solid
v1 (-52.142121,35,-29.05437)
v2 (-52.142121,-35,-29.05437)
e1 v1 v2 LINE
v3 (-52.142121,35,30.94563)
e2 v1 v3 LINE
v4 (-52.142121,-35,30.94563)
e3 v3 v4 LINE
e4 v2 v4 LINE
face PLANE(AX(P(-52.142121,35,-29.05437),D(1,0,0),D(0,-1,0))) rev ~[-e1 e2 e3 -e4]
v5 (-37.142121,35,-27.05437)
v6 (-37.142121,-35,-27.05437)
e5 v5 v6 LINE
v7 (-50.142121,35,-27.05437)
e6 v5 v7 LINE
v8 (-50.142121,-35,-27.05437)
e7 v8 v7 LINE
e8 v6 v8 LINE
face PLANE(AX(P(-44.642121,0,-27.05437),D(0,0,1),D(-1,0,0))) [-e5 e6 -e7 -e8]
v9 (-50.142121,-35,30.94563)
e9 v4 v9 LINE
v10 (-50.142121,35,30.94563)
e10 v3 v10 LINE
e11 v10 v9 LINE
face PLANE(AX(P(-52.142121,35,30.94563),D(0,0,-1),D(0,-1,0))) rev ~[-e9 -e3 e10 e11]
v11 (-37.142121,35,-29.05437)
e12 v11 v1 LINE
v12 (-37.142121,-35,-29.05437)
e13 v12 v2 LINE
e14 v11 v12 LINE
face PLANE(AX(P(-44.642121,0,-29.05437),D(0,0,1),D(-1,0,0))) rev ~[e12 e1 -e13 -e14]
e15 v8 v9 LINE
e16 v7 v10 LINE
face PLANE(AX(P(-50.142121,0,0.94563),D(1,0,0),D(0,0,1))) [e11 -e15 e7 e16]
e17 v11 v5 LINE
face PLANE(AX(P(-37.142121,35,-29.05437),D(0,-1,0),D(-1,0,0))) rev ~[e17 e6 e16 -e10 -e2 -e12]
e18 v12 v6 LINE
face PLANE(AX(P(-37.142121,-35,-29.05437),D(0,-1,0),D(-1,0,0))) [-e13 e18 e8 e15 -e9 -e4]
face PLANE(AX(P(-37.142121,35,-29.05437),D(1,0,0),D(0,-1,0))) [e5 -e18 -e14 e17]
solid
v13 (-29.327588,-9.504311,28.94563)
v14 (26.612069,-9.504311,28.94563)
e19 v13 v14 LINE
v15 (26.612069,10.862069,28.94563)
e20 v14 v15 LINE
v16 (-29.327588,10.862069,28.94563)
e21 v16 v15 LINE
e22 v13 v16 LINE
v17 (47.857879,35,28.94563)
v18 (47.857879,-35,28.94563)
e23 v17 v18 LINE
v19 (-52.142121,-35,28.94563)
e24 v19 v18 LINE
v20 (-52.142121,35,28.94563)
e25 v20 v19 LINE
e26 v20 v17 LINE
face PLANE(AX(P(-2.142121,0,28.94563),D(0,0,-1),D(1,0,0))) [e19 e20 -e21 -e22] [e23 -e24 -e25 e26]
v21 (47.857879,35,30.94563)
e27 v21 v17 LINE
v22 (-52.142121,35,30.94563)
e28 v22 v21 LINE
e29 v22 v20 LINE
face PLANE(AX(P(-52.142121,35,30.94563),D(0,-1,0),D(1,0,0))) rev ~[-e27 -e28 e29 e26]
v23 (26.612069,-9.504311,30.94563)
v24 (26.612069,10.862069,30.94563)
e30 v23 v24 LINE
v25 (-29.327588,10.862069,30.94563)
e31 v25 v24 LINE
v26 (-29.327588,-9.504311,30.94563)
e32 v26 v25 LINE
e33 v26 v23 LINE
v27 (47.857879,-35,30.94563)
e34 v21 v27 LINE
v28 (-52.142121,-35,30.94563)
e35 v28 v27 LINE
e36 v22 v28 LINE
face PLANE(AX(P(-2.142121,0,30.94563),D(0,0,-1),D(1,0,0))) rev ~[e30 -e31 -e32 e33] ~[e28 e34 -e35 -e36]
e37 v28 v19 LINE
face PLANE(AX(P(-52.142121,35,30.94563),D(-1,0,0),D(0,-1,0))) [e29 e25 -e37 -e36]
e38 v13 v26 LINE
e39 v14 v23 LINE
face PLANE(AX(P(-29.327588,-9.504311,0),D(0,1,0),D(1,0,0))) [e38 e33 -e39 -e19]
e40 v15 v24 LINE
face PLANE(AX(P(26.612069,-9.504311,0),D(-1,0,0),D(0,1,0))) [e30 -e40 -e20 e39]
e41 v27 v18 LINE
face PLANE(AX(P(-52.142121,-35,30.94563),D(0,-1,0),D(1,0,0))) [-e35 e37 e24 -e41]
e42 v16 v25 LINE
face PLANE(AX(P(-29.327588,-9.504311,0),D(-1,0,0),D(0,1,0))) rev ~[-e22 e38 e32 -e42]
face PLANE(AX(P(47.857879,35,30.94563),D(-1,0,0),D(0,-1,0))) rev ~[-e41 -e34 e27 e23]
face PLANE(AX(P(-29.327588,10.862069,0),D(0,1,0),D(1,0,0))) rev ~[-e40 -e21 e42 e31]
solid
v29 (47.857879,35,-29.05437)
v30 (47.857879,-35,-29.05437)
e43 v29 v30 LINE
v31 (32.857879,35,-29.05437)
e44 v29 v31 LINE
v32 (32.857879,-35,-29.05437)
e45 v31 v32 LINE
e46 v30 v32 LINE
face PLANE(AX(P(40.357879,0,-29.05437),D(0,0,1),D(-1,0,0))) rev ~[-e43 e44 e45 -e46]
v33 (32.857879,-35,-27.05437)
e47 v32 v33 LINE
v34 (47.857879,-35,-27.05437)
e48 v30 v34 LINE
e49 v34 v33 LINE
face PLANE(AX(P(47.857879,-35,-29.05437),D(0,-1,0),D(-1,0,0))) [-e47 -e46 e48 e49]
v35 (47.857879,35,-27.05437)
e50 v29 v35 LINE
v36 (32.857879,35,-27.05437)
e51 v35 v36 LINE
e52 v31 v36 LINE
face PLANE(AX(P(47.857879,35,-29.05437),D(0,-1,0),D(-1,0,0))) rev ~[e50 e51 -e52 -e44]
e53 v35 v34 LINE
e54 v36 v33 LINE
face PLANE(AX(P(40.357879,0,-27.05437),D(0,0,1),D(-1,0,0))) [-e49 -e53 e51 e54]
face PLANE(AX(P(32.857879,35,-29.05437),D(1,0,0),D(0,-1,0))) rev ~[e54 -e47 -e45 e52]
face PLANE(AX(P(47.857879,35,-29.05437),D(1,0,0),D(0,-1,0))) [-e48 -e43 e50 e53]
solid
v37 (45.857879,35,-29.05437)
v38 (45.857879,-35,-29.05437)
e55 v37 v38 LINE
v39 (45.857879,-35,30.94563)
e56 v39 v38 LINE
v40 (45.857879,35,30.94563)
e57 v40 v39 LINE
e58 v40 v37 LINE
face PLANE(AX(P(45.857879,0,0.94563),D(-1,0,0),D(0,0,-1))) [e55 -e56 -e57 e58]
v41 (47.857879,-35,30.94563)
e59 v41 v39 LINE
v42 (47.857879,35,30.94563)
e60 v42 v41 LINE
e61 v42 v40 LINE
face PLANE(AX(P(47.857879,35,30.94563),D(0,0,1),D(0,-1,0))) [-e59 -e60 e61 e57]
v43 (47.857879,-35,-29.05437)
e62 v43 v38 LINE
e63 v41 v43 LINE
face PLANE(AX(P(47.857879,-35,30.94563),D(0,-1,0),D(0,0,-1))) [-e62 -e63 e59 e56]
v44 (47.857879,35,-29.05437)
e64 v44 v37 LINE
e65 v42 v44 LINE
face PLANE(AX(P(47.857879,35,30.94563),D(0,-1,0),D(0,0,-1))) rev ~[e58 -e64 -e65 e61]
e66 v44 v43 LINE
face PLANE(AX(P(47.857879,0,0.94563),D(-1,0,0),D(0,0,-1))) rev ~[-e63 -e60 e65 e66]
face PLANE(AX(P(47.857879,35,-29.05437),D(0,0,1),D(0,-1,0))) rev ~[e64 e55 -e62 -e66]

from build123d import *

# Parameters (mm, degrees)
F1_E0_W  = 15
F1_E0_H  = 70
F2_DEPTH = 2
F1_E4_W  = 15
F1_E4_H  = 70
F1_E1_W  = 60
F1_E1_H  = 70
F3_DEPTH = 2
F1_E2_W  = 100
F1_E2_H  = 70
F4_DEPTH = 2
F1_E3_W  = 60
F1_E3_H  = 70
F5_DEPTH = 2
F6_W     = 55.9396576136
F6_H     = 20.3663799912
F7_DEPTH = 30.9466302677


with BuildPart() as f2:
    # F1_E0 (on explicit) → F2 (new body)
    with BuildSketch(Plane(origin=(-37.1421206879, 35, -29.0543697323), x_dir=(-1, 0, 0), z_dir=(0, 0, 1))):
        with Locations((7.5, 35)):
            Rectangle(F1_E0_W, F1_E0_H)
    extrude(amount=F2_DEPTH)

    # F1_E1 (on explicit) → F3 (join)
    with BuildSketch(Plane(origin=(-52.1421206879, 35, -29.0543697323), x_dir=(0, 0, 1), z_dir=(1, 0, 0))):
        with Locations((30, 35)):
            Rectangle(F1_E1_W, F1_E1_H)
    extrude(amount=F3_DEPTH)


with BuildPart() as f2b:
    # F1_E4 (on explicit) → F2, piece 2 (new body)
    with BuildSketch(Plane(origin=(47.8578793121, 35, -29.0543697323), x_dir=(-1, 0, 0), z_dir=(0, 0, 1))):
        with Locations((7.5, 35)):
            Rectangle(F1_E4_W, F1_E4_H)
    extrude(amount=F2_DEPTH)


with BuildPart() as f4:
    # F1_E2 (on explicit) → F4 (new body)
    with BuildSketch(Plane(origin=(-52.1421206879, 35, 30.9456302677), x_dir=(1, 0, 0), z_dir=(0, 0, -1))):
        with Locations((50, 35)):
            Rectangle(F1_E2_W, F1_E2_H)
    extrude(amount=F4_DEPTH)

    # F6 (on Top) → F7 (cut, through all)
    with BuildSketch(Plane.XY):
        with Locations((-1.357759349, 0.6788792089)):
            Rectangle(F6_W, F6_H)
    extrude(amount=F7_DEPTH, mode=Mode.SUBTRACT)


with BuildPart() as f5:
    # F1_E3 (on explicit) → F5 (new body)
    with BuildSketch(Plane(origin=(47.8578793121, 35, 30.9456302677), x_dir=(0, 0, -1), z_dir=(-1, 0, 0))):
        with Locations((30, 35)):
            Rectangle(F1_E3_W, F1_E3_H)
    extrude(amount=F5_DEPTH)


solid = Compound([f2.part, f2b.part, f4.part, f5.part])
